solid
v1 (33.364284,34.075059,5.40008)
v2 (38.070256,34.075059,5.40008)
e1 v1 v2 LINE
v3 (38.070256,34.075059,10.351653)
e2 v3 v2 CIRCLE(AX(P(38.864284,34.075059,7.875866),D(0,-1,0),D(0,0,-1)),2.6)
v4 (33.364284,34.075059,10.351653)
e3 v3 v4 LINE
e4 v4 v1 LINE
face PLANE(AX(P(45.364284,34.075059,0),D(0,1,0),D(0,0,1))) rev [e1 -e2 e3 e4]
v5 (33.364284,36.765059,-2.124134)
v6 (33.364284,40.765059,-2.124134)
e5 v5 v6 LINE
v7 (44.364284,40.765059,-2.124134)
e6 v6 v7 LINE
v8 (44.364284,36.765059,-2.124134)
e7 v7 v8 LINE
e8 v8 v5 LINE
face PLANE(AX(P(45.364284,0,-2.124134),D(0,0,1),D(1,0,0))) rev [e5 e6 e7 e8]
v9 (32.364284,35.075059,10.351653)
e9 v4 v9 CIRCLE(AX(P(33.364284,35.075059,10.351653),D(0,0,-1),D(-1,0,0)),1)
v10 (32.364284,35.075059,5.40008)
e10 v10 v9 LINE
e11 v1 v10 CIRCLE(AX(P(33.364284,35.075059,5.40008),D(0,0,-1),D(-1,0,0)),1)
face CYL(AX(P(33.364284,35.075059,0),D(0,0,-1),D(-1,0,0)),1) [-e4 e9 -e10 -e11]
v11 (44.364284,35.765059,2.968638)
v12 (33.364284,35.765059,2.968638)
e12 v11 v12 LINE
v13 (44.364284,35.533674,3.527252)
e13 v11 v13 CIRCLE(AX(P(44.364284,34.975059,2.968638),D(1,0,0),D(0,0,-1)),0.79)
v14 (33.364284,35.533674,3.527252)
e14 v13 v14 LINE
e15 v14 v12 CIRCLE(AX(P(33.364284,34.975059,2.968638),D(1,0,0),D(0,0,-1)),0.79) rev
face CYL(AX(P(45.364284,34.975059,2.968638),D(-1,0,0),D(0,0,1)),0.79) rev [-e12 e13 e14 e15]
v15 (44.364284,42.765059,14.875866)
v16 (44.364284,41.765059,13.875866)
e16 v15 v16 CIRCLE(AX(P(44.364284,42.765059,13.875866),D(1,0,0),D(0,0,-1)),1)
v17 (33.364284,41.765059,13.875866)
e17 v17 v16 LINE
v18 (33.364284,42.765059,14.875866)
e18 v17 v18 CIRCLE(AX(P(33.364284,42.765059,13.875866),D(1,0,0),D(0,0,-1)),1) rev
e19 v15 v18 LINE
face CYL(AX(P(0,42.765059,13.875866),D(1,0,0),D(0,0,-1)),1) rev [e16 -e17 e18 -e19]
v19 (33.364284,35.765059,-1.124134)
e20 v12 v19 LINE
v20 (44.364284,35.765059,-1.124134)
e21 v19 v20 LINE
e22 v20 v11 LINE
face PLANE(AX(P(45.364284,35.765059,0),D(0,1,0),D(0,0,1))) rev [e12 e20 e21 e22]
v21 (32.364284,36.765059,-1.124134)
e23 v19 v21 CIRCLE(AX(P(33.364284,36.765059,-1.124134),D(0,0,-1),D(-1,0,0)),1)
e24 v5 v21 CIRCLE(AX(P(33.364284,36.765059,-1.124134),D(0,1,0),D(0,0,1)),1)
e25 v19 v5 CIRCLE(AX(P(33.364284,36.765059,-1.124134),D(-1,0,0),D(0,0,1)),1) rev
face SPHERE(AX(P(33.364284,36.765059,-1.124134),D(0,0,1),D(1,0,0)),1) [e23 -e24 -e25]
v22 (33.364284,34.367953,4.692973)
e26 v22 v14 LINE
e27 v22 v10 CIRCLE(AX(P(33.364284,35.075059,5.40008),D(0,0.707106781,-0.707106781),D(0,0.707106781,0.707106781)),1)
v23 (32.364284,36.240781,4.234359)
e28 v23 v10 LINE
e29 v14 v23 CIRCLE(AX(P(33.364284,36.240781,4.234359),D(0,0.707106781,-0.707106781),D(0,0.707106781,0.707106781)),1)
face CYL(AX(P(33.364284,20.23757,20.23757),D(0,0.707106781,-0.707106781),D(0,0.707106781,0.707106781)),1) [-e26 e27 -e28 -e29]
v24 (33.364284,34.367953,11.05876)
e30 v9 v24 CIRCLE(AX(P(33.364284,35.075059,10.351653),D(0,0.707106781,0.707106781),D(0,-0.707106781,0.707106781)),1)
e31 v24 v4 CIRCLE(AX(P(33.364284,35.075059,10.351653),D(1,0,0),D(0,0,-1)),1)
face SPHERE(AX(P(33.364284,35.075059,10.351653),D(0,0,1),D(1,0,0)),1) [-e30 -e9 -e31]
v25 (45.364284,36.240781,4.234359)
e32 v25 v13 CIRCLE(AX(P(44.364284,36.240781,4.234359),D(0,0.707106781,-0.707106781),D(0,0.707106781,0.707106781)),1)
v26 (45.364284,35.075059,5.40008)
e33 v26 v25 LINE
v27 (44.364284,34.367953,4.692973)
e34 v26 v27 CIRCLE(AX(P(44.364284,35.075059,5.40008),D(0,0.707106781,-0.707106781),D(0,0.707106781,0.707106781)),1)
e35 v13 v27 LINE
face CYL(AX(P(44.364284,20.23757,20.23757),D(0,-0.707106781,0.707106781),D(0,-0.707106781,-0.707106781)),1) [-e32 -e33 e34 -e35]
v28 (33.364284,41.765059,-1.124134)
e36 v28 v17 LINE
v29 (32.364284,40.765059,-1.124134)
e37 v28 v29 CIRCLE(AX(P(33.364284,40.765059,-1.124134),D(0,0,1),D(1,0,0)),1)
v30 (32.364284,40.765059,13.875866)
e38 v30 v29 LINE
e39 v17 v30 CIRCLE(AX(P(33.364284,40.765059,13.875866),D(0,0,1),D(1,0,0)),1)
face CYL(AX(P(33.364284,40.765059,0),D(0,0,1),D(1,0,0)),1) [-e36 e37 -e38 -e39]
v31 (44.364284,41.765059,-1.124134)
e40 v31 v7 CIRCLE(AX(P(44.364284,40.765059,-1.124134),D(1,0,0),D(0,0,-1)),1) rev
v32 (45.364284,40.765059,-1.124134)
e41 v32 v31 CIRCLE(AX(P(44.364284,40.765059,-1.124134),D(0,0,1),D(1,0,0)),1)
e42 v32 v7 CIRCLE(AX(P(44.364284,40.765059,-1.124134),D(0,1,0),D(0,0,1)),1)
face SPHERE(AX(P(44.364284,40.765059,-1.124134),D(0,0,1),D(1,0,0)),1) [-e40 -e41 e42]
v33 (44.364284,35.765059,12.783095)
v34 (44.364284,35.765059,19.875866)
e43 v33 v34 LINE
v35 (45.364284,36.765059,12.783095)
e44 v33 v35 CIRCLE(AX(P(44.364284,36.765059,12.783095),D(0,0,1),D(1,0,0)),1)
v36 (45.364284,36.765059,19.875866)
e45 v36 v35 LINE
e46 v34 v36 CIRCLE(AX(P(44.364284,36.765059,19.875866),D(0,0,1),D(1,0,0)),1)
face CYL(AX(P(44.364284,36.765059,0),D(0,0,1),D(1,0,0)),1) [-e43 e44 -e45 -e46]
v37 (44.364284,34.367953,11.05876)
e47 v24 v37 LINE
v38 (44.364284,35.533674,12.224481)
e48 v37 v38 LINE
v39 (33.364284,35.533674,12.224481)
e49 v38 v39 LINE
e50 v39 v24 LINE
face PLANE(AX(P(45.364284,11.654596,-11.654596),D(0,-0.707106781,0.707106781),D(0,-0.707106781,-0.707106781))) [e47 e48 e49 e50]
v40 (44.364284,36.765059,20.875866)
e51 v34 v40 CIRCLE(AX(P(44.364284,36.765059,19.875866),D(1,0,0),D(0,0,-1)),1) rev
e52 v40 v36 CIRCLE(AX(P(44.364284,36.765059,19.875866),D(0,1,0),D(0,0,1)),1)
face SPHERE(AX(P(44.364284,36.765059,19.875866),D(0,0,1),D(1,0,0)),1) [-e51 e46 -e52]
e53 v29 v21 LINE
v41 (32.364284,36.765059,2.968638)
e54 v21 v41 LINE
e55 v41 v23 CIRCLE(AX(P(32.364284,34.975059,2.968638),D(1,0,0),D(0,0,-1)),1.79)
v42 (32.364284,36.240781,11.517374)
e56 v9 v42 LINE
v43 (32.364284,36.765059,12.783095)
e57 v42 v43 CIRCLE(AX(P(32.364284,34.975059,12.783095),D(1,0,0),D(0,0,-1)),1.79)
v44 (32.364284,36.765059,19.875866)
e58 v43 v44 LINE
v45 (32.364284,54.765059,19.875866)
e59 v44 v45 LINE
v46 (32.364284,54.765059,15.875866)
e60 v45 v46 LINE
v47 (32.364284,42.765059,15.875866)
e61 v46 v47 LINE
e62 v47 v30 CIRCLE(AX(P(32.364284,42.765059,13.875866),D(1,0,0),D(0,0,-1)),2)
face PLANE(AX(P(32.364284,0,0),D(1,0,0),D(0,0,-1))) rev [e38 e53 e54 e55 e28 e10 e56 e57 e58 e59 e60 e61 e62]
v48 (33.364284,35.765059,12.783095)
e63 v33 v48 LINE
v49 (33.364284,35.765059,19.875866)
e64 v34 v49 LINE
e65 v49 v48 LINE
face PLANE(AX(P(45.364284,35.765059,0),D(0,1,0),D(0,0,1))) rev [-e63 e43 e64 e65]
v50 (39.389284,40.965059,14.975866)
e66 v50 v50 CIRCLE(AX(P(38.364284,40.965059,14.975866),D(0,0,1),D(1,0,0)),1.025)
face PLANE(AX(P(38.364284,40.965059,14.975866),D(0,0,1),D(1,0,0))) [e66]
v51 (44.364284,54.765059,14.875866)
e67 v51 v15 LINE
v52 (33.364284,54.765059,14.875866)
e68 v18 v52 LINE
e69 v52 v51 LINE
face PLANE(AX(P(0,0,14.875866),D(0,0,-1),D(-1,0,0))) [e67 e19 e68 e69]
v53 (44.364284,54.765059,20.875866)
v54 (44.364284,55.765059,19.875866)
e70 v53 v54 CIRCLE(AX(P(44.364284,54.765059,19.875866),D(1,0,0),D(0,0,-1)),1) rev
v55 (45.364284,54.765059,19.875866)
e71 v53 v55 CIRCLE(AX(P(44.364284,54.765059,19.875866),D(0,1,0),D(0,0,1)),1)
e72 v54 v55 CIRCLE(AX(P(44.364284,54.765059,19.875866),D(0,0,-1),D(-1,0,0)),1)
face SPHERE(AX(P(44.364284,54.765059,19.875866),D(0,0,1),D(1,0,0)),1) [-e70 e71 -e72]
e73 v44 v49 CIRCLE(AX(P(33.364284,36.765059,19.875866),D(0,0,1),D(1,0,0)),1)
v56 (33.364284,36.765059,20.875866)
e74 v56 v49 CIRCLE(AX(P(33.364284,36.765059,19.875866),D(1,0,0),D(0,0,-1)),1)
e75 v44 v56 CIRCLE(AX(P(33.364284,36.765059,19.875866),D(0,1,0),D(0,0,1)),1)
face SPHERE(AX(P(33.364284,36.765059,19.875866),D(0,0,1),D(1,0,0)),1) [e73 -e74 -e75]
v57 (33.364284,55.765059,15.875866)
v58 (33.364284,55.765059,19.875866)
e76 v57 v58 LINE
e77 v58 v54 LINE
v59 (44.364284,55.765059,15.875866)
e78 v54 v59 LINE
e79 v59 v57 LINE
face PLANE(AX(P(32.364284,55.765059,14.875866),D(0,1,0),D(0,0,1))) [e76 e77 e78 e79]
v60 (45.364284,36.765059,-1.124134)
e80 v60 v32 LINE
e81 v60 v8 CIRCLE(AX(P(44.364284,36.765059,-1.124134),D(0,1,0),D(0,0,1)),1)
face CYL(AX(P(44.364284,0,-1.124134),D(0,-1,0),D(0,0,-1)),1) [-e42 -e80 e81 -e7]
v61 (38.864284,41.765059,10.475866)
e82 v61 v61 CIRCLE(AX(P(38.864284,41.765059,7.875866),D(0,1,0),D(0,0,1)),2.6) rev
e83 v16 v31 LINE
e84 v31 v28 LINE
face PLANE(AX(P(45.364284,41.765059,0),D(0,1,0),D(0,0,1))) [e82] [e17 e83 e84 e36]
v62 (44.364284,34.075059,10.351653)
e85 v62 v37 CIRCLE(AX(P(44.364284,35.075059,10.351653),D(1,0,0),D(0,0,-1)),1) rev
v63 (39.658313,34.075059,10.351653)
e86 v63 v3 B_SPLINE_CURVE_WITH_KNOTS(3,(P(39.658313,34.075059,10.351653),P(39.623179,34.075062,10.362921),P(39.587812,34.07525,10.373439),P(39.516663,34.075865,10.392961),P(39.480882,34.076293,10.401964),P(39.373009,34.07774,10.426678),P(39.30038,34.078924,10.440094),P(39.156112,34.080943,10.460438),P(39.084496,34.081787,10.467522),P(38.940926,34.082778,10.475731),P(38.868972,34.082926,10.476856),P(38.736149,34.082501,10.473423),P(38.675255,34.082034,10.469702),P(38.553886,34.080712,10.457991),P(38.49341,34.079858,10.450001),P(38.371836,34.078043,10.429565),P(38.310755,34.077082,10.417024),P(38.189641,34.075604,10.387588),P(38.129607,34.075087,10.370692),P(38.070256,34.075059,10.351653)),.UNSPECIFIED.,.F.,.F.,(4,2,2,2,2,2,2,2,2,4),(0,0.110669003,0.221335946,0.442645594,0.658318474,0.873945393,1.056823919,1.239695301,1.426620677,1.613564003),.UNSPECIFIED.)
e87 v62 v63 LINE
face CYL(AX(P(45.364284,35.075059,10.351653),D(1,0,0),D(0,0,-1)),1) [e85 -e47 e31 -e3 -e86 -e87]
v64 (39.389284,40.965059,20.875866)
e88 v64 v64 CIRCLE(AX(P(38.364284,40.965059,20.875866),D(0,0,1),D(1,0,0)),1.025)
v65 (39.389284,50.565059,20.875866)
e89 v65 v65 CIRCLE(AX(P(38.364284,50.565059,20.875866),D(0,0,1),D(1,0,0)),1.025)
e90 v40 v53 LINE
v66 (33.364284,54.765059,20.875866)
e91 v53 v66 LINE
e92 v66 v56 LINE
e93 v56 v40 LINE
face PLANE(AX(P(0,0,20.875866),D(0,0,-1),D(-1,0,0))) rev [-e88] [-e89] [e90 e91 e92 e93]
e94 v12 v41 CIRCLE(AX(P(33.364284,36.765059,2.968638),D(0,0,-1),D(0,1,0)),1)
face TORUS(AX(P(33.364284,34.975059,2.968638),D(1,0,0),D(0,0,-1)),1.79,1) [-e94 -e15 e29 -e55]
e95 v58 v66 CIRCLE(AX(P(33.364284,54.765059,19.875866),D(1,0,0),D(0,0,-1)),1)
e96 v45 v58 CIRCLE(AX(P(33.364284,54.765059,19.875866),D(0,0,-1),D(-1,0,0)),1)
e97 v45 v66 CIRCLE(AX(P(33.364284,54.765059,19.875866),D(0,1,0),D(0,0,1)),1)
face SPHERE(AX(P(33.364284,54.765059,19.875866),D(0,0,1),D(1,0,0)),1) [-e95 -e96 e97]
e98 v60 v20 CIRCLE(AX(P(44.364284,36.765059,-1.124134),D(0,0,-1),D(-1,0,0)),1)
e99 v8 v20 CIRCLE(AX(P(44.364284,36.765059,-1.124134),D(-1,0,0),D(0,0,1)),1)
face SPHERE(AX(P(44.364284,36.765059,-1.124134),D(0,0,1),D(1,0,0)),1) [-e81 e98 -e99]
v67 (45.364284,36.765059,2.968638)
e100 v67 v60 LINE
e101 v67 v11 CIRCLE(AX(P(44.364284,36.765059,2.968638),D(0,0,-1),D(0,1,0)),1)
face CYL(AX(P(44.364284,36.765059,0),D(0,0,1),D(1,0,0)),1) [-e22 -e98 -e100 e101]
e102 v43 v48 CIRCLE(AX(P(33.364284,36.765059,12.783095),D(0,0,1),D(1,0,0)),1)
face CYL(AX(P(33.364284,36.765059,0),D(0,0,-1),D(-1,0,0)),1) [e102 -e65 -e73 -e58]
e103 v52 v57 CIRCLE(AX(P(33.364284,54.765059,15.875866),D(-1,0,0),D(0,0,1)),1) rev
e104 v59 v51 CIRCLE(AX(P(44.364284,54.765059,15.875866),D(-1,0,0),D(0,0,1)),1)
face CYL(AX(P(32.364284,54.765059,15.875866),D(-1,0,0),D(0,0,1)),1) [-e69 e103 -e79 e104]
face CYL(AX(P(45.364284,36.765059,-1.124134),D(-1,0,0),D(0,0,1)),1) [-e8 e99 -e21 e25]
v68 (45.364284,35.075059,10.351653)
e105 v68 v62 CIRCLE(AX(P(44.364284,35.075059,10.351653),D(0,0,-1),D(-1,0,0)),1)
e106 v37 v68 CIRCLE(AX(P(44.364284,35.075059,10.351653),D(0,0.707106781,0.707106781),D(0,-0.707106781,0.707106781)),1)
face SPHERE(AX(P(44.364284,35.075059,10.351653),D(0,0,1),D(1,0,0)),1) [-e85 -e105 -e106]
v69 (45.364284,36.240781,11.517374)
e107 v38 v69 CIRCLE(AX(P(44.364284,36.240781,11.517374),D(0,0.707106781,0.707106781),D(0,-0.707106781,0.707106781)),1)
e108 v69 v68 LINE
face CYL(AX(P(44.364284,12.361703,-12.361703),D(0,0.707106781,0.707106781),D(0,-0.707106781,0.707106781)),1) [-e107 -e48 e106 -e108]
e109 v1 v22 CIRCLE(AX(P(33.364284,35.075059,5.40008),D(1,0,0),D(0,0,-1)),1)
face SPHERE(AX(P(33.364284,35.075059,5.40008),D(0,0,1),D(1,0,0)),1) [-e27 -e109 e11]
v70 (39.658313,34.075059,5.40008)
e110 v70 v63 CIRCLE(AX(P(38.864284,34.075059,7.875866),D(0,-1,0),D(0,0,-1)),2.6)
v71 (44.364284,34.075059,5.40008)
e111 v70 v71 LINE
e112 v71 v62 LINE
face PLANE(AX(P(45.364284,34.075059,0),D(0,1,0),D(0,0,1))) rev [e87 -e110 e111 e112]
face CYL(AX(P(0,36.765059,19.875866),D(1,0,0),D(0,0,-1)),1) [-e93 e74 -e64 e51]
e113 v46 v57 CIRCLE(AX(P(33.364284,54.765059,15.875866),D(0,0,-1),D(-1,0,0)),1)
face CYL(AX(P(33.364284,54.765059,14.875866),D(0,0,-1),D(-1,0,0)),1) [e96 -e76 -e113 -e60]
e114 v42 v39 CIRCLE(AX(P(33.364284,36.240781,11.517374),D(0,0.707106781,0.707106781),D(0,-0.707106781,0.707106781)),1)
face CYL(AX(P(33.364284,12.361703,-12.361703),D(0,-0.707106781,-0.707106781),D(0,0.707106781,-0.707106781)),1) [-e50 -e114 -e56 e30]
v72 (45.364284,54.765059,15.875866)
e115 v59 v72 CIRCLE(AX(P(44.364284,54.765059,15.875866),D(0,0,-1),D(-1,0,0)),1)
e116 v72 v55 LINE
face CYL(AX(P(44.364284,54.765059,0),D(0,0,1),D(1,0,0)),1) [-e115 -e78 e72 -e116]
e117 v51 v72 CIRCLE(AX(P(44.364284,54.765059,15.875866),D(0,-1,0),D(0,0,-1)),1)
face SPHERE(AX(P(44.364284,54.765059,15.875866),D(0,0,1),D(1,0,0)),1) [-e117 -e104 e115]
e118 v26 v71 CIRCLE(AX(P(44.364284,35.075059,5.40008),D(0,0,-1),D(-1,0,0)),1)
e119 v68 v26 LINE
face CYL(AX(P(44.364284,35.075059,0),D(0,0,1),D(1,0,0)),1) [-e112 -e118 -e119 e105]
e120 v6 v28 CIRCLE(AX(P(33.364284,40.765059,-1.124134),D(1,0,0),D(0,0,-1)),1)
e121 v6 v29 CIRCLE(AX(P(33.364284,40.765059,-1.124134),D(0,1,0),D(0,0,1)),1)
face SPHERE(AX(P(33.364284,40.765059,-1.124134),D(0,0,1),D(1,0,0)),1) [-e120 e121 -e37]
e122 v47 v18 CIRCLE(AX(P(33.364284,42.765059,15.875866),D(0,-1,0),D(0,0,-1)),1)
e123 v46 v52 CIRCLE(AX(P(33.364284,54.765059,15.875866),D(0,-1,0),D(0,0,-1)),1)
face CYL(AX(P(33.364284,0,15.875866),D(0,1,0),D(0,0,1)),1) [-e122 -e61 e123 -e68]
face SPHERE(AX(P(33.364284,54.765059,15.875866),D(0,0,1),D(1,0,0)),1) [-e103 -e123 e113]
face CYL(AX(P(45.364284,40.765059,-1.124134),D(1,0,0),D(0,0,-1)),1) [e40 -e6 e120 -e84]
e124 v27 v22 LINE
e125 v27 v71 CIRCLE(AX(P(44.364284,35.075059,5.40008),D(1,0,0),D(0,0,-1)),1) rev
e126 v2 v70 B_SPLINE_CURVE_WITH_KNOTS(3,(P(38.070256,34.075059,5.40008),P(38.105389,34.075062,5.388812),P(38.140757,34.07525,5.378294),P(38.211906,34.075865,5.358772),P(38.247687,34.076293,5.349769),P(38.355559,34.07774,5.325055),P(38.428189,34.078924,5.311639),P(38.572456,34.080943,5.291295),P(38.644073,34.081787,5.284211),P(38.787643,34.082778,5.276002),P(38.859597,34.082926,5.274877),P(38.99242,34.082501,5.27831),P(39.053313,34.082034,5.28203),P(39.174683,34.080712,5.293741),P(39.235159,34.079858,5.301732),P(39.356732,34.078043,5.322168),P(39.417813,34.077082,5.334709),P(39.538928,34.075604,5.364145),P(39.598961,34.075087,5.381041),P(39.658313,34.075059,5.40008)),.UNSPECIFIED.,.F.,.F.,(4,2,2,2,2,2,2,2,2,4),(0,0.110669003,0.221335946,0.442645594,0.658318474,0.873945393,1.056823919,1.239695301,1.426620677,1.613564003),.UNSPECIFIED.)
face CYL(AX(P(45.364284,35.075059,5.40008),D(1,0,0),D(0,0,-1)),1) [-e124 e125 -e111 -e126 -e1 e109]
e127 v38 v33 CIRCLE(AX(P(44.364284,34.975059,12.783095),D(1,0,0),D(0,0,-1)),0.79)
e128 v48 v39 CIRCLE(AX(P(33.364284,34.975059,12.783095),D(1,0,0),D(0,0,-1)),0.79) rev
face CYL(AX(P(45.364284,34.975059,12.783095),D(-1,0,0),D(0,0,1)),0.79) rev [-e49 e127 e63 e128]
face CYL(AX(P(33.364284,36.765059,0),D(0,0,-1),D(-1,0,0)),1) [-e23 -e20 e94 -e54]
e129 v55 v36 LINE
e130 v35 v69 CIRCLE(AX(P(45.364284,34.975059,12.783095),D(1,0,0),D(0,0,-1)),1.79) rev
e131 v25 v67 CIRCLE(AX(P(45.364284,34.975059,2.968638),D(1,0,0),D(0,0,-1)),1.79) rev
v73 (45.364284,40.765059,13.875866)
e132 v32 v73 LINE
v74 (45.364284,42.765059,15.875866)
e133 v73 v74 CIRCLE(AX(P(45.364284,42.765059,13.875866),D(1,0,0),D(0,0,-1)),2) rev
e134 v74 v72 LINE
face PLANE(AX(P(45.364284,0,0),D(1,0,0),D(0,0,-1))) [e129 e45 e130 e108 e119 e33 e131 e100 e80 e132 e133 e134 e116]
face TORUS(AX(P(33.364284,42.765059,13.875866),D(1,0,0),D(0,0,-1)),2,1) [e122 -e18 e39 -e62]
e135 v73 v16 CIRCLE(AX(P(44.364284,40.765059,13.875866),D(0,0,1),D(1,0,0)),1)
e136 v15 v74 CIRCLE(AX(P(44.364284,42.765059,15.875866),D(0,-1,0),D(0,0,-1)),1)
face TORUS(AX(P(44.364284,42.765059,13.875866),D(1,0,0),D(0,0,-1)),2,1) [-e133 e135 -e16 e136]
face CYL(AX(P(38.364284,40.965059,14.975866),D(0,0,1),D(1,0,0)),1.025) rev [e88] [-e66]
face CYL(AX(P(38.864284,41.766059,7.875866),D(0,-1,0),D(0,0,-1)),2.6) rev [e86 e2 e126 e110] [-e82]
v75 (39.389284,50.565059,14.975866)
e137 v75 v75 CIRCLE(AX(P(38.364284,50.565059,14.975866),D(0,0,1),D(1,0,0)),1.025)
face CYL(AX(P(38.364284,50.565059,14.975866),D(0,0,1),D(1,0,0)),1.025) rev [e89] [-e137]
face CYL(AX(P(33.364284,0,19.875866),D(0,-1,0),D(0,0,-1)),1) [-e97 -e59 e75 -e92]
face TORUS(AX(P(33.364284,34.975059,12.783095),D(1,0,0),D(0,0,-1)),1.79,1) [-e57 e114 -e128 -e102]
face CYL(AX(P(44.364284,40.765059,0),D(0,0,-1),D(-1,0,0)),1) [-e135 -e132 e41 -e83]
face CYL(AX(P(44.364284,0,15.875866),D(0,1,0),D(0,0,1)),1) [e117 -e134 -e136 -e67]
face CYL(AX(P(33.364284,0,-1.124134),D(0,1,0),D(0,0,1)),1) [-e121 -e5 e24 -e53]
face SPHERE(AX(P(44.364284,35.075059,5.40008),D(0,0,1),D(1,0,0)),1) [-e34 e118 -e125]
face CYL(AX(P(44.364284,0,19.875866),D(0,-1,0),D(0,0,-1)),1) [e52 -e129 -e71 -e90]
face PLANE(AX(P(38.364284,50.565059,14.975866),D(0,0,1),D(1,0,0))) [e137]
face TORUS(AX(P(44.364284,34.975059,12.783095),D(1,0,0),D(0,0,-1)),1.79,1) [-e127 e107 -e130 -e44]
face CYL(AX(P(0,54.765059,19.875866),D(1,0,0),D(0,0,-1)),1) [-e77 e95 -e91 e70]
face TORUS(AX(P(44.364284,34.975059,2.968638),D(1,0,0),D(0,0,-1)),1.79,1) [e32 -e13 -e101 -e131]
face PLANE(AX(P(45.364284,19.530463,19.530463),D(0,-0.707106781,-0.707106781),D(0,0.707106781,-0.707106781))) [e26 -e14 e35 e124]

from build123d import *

# Parameters (mm, degrees)
SKETCH1_W                = 20
SKETCH1_H                = 6
BOSS_EXTRUDE1_DEPTH      = 13
CUT_EXTRUDE1_REACH       = 51.362
SKETCH2_R                = 2.6
BOSS_EXTRUDE2_DEPTH      = 3
BOSS_EXTRUDE2_DEPTH_BACK = 3
SKETCH3_W                = 13
SKETCH3_H                = 20
SKETCH4_R                = 1.025
CUT_EXTRUDE2_DEPTH       = 5.9
FILLET1_R                = 1
FILLET2_R                = 1


with BuildPart() as part:
    # Sketch1 → Boss-Extrude1 (new body)
    with BuildSketch(Plane(origin=(32.364284334, 0, 0), x_dir=(0, 0, -1), z_dir=(1, 0, 0))):
        with Locations((-7.875866483, 38.765059464)):
            Rectangle(SKETCH1_W, SKETCH1_H)
        with BuildLine():
            Line((-12.22448084, 35.533673821), (-10.765866483, 34.075059464))
            Line((-10.765866483, 34.075059464), (-4.985866483, 34.075059464))
            Line((-4.985866483, 34.075059464), (-3.527252126, 35.533673821))
            ThreePointArc((-3.527252126, 35.533673821), (-3.27095768, 35.704924294), (-2.968637768, 35.765059464))
            Line((-2.968637768, 35.765059464), (-12.783095197, 35.765059464))
            ThreePointArc((-12.783095197, 35.765059464), (-12.480775285, 35.704924294), (-12.22448084, 35.533673821))
        make_face()
    extrude(amount=BOSS_EXTRUDE1_DEPTH)

    # Sketch2 → Cut-Extrude1 (cut, up to next)
    with BuildSketch(Plane.XZ.offset(-34.075059464), mode=Mode.PRIVATE) as cut_extrude1_sk1:
        with Locations(Location((38.864284334, 7.875866483, 0), (0, 0, 270))):
            Circle(SKETCH2_R)
    cut_extrude1_tool1 = extrude(cut_extrude1_sk1.sketch, amount=-CUT_EXTRUDE1_REACH, mode=Mode.PRIVATE) & part.part
    add(cut_extrude1_tool1.solids().sort_by_distance((38.864284, 34.075059, 7.875866))[0], mode=Mode.SUBTRACT)

    # Sketch3 → Boss-Extrude2 (add, two sides: drawn at the far end of the back side and taken through both)
    with BuildSketch(Plane.XY.offset(17.875866483).offset(-BOSS_EXTRUDE2_DEPTH_BACK)):
        with Locations((38.864284334, 45.765059464)):
            Rectangle(SKETCH3_W, SKETCH3_H)
    extrude(amount=BOSS_EXTRUDE2_DEPTH + BOSS_EXTRUDE2_DEPTH_BACK)

    # Sketch4 → Cut-Extrude2 (cut)
    with BuildSketch(Plane.XY.offset(20.875866483)):
        with Locations((38.364284334, 50.565059464)):
            Circle(SKETCH4_R)
        with Locations((38.364284334, 40.965059464)):
            Circle(SKETCH4_R)
    extrude(amount=-CUT_EXTRUDE2_DEPTH, mode=Mode.SUBTRACT)

    # Fillet1
    # the kernel refuses this fillet: 1 mm, written as the material it adds along each edge
    with BuildSketch(Plane(origin=(45.364284334, 41.765059464, 14.875866483), x_dir=(0, 0, -1), z_dir=(-1, 0, 0))) as fillet1_piece_1:
        with BuildLine():
            CenterArc((FILLET1_R, -FILLET1_R), FILLET1_R, 90, 90)
            Line((0, -FILLET1_R), (0, 0))
            Line((0, 0), (FILLET1_R, 0))
        make_face()
    extrude(amount=13)
    # the kernel refuses this fillet: 1 mm, written as the material it takes off along each edge
    with BuildSketch(Plane(origin=(47.864284334, 55.765059464, 14.875866483), x_dir=(0, -1, 0), z_dir=(-1, 0, 0)), Plane(origin=(29.864284334, 35.765059464, 20.875866483), x_dir=(0, 0, -1), z_dir=(1, 0, 0))) as fillet1_2_piece_1:
        with BuildLine():
            CenterArc((FILLET1_R, FILLET1_R), FILLET1_R, 180, 90)
            Line((0, FILLET1_R), (0, 0))
            Line((0, 0), (FILLET1_R, 0))
        make_face()
    extrude(amount=18, mode=Mode.SUBTRACT)
    with BuildSketch(Plane(origin=(47.864284334, 55.765059464, 20.875866483), x_dir=(0, -1, 0), z_dir=(-1, 0, 0)), Plane(origin=(29.864284334, 41.765059464, -2.124133517), x_dir=(0, -1, 0), z_dir=(1, 0, 0)), Plane(origin=(29.864284334, 35.765059464, -2.124133517), x_dir=(0, 0, 1), z_dir=(1, 0, 0))) as fillet1_2_piece_2:
        with BuildLine():
            CenterArc((FILLET1_R, -FILLET1_R), FILLET1_R, 90, 90)
            Line((0, -FILLET1_R), (0, 0))
            Line((0, 0), (FILLET1_R, 0))
        make_face()
    extrude(amount=18, mode=Mode.SUBTRACT)
    with BuildSketch(Plane(origin=(31.328750428, 34.075059464, 4.985866483), x_dir=(0, 0, 1), z_dir=(1, 0, 0)), Plane(origin=(31.328750428, 34.075059464, 10.765866483), x_dir=(0, 0.7071067811865432, 0.7071067811865518), z_dir=(1, 0, 0))) as fillet1_2_piece_3:
        with BuildLine():
            CenterArc((FILLET1_R * 0.414213562373, -FILLET1_R), FILLET1_R, 90, 45)
            Line((-FILLET1_R * 0.292893218813, -FILLET1_R * 0.292893218813), (0, 0))
            Line((0, 0), (FILLET1_R * 0.414213562373, 0))
        make_face()
    extrude(amount=15.071067812, mode=Mode.SUBTRACT)

    # Fillet2
    fillet2_edges = [part.edges().sort_by_distance(p)[0] for p in [
        (45.364284334, 35.704924294, 12.480775285),
        (32.364284334, 35.765059464, 0.922252126),
        (32.364284334, 35.704924294, 3.27095768),
        (32.364284334, 34.950813252, 4.110112695),
        (32.364284334, 35.704924294, 12.480775285),
        (32.364284334, 48.765059464, 14.875866483),
        (32.364284334, 41.765059464, 6.375866483),
        (32.364284334, 38.765059464, -2.124133517),
        (32.364284334, 34.075059464, 7.875866483),
        (32.364284334, 34.950813252, 11.641620271),
        (32.364284334, 35.765059464, 16.32948084),
        (32.364284334, 45.765059464, 20.875866483),
        (32.364284334, 55.765059464, 17.875866483),
        (32.364284334, 36.057952683, 20.582973264),
        (32.364284334, 55.472166245, 15.168759702),
        (32.364284334, 41.472166245, -1.831240298),
        (32.364284334, 55.472166245, 20.582973264),
        (32.364284334, 36.057952683, -1.831240298),
        (32.364284334, 34.151179931, 10.734336353),
        (32.364284334, 34.151179931, 5.017396613),
        (45.364284334, 34.075059464, 7.875866483),
        (45.364284334, 41.765059464, 6.375866483),
        (45.364284334, 48.765059464, 14.875866483),
        (45.364284334, 55.765059464, 17.875866483),
        (45.364284334, 45.765059464, 20.875866483),
        (45.364284334, 35.765059464, 16.32948084),
        (45.364284334, 34.950813252, 11.641620271),
        (45.364284334, 38.765059464, -2.124133517),
        (45.364284334, 36.057952683, 20.582973264),
        (45.364284334, 55.472166245, 15.168759702),
        (45.364284334, 41.472166245, -1.831240298),
        (45.364284334, 55.472166245, 20.582973264),
        (45.364284334, 36.057952683, -1.831240298),
        (45.364284334, 34.151179931, 10.734336353),
        (45.364284334, 34.151179931, 5.017396613),
        (32.364284334, 42.057952683, 14.582973264),
        (45.364284334, 42.057952683, 14.582973264),
        (45.364284334, 34.950813252, 4.110112695),
        (45.364284334, 35.704924294, 3.27095768),
        (45.364284334, 35.765059464, 0.922252126),
    ]]
    fillet(fillet2_edges, radius=FILLET2_R)


solid = part.part
